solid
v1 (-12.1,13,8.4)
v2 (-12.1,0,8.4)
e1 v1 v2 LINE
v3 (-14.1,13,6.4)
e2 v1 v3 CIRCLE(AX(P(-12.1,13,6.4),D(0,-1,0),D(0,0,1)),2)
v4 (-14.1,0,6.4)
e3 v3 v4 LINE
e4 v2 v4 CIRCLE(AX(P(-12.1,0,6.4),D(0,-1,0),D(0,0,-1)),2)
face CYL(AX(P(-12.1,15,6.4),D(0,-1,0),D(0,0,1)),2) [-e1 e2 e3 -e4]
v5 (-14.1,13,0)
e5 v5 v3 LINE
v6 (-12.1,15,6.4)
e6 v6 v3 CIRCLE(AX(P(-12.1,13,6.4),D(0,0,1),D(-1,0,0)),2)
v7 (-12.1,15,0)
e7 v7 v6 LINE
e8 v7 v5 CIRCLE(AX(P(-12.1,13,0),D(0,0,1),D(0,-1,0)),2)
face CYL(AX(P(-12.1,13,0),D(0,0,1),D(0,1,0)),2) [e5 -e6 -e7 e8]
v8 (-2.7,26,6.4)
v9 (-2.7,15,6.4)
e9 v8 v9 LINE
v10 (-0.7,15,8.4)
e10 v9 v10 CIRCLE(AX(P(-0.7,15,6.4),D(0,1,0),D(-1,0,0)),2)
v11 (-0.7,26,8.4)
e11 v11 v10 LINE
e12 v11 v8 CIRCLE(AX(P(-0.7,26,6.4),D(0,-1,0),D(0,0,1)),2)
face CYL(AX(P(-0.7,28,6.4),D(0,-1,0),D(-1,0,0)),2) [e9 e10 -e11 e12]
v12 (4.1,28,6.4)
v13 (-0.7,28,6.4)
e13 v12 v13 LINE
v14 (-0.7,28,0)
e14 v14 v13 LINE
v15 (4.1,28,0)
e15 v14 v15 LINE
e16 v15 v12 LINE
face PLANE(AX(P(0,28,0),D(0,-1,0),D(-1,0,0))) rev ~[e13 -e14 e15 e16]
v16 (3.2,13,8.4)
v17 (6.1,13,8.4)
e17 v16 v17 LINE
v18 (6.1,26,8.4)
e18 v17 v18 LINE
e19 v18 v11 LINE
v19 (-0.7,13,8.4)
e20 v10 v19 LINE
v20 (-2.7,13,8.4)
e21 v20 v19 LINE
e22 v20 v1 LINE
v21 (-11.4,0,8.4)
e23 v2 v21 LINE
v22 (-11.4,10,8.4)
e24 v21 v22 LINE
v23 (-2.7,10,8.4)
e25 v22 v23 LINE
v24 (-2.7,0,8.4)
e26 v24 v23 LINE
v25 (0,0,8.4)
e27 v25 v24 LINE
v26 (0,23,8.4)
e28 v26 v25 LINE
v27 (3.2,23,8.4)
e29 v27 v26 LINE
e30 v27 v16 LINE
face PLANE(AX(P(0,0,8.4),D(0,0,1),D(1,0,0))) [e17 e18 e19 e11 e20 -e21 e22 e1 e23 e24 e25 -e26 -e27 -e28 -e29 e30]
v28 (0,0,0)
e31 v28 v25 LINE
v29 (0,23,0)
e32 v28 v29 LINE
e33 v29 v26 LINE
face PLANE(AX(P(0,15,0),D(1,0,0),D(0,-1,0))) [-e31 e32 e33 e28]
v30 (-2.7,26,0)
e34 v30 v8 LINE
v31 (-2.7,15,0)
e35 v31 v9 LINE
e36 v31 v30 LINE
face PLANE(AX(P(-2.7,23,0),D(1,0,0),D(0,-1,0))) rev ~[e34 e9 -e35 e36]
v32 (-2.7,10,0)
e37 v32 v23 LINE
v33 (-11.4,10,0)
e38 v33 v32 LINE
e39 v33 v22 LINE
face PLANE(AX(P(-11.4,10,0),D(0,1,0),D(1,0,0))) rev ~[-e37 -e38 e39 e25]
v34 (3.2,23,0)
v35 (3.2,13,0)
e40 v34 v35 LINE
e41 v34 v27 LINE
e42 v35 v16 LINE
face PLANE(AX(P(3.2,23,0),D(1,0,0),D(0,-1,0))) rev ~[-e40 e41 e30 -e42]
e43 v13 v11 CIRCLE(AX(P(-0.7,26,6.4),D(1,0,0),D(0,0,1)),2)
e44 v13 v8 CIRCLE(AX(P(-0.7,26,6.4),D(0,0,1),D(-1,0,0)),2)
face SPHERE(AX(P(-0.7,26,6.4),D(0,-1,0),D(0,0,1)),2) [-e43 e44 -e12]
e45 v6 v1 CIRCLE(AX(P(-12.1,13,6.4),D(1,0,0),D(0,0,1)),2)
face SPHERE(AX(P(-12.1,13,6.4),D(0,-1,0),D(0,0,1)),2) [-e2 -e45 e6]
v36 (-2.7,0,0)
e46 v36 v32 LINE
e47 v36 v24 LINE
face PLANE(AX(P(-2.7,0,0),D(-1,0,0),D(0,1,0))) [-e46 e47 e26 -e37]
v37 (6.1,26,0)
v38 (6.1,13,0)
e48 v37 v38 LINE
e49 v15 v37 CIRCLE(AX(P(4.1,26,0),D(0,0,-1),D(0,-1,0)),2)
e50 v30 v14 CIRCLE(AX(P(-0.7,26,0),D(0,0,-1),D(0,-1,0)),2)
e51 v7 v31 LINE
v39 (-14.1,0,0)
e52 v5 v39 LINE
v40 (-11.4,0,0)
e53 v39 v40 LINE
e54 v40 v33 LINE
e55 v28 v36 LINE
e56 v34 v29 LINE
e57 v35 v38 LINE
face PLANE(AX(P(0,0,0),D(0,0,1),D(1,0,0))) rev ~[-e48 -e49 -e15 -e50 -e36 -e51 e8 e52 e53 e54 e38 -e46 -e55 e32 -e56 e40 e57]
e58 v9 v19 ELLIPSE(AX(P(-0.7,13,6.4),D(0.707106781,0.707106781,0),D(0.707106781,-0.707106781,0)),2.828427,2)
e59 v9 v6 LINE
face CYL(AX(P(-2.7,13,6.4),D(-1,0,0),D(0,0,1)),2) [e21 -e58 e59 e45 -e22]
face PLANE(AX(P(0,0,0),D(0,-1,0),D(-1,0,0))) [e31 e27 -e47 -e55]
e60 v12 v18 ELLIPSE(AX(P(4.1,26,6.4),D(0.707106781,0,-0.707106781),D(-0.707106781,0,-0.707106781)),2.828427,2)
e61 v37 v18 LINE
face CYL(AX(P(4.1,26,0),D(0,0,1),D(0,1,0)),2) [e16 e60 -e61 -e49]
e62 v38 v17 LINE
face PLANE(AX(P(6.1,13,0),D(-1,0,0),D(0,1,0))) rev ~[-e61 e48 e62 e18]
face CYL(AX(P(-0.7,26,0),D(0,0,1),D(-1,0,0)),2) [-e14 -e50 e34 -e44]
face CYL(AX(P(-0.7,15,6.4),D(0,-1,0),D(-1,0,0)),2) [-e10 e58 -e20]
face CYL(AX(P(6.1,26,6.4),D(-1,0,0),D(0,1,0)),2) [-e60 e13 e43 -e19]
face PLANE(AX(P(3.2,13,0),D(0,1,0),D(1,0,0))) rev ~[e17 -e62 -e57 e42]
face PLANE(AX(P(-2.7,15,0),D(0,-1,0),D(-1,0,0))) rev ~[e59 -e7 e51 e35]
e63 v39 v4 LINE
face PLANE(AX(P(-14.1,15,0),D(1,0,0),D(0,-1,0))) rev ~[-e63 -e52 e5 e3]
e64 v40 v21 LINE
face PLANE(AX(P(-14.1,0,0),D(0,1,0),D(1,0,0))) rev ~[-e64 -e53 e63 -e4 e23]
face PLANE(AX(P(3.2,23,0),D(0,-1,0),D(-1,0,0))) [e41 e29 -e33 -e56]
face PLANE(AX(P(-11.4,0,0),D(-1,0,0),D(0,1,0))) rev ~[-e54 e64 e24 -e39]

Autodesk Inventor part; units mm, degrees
ref_plane "YZ Plane" through (0, 0, 0) normal (1, 0, 0) x (0, 1, 0)
ref_plane "XZ Plane" through (0, 0, 0) normal (0, 1, 0) x (-1, 0, 0)
ref_plane "XY Plane" through (0, 0, 0) normal (0, 0, 1) x (1, 0, 0)
sketch "Sketch1" plane through (0, 0, 0) normal (0, 0, 1) x (1, 0, 0)
  line L0 (0, 0) -> (-8.7, 0)
  line L1 (-8.7, 0) -> (-8.7, 8.7)
  line L2 (-8.7, 8.7) -> (0, 8.7)
  line L3 (0, 8.7) -> (0, 0)
  dimension "d0" = 8.7
  dimension "d1" = 8.7
extrude "Extrusion1" [suppressed]
sketch "Sketch2" plane through (-8.7, 0, 0) normal (-1, 0, 0) x (0, 0, 1)
  line L0 (0, 8.7) -> (0, 0) projected
  line L1 (0, 0) -> (3, 0)
  line L2 (3, 0) -> (3, 8.7)
  line L3 (3, 8.7) -> (0, 8.7)
  line L4 (0, 8.7) -> (0, 0)
extrude "Extrusion2" [suppressed]
sketch "Sketch3" plane through (0, 0, 3) normal (0, 0, 1) x (1, 0, 0)
  line L0 (0, 8.7) -> (-11.7, 8.7) projected
  line L1 (0, 0) -> (-11.7, 0) projected
  line L2 (-11.7, 8.7) -> (-8.7, 8.7)
  line L3 (-8.7, 8.7) -> (-8.7, 0)
  line L4 (-8.7, 0) -> (-11.7, 0)
  line L5 (-11.7, 0) -> (-11.7, 8.7)
  dimension "d6" = 3
extrude "Extrusion3" [suppressed]
sketch "Sketch5" plane through (0, 0, 0) normal (1, 0, 0) x (0, 0, -1)
  line L0 (0, 8.7) -> (-3, 8.7) projected
  line L1 (0, 0) -> (-3, 0)
  line L2 (-3, 0) -> (-3, 8.7)
  line L3 (-3, 8.7) -> (0, 8.7)
  line L4 (0, 8.7) -> (0, 0)
  dimension "d9" = 3
extrude "Extrusion4" [suppressed]
sketch "Sketch6" plane through (0, 0, 3) normal (0, 0, 1) x (1, 0, 0)
  line L0 (3, 8.7) -> (-11.7, 8.7) projected
  line L1 (3, 8.7) -> (0, 8.7)
  line L2 (0, 8.7) -> (0, 0)
  line L3 (0, 0) -> (3, 0)
  line L4 (3, 0) -> (3, 8.7)
extrude "Extrusion5" [suppressed]
sketch "Sketch7" plane through (0, 0, 0) normal (0, 0, 1) x (1, 0, 0)
  line L0 (0, 0) -> (-2.7, 0)
  line L1 (-2.7, 0) -> (-2.7, 15)
  line L2 (-2.7, 15) -> (0, 15)
  line L3 (0, 15) -> (0, 0)
  line L4 (-2.7, 15) -> (-11.4, 15)
  line L5 (-11.4, 15) -> (-11.4, 10)
  line L6 (-11.4, 10) -> (-2.7, 10)
  line L7 (-2.7, 10) -> (-2.7, 15)
  line L8 (-11.4, 15) -> (-14.1, 15)
  line L9 (-14.1, 15) -> (-14.1, 0)
  line L10 (-14.1, 0) -> (-11.4, 0)
  line L11 (-11.4, 0) -> (-11.4, 15)
  line L12 (-2.7, 15) -> (0, 15)
  line L13 (0, 15) -> (0, 23)
  line L14 (0, 23) -> (-2.7, 23)
  line L15 (-2.7, 23) -> (-2.7, 15)
  line L16 (-2.7, 23) -> (0, 23)
  line L17 (0, 23) -> (0, 28)
  line L18 (0, 28) -> (-2.7, 28)
  line L19 (-2.7, 28) -> (-2.7, 23)
  line L20 (0, 28) -> (3.2, 28)
  line L21 (3.2, 28) -> (3.2, 23)
  line L22 (3.2, 23) -> (0, 23)
  line L23 (0, 23) -> (0, 28)
  line L24 (3.2, 28) -> (6.1, 28)
  line L25 (6.1, 28) -> (6.1, 23)
  line L26 (6.1, 23) -> (3.2, 23)
  line L27 (3.2, 23) -> (3.2, 28)
  line L28 (6.1, 23) -> (3.2, 23)
  line L29 (3.2, 23) -> (3.2, 13)
  line L30 (3.2, 13) -> (6.1, 13)
  line L31 (6.1, 13) -> (6.1, 23)
  point P0 (-11.4, 10)
  point P1 (-2.7, 10)
  dimension "d14" = 2.7
  dimension "d15" = 15
  dimension "d16" = 8.7
  dimension "d17" = 5
  dimension "d18" = 2.7
  dimension "d19" = 15
  dimension "d23" = 2.7
  dimension "d24" = 8
  dimension "d25" = 5
  dimension "d26" = 3.2
  dimension "d27" = 5
  dimension "d28" = 2.9
  dimension "d29" = 2.9
  dimension "d30" = 10
extrude "Extrusion6" add sketch "Sketch7" along normal blind 8.4
fillet "Fillet1" radius 2 3 edges at (-14.1, 7.5, 8.4) (-8.4, 15, 8.4) (-14.1, 15, 4.2)
fillet "Fillet2" radius 2 4 edges at (-2.7, 21.5, 8.4) (1.7, 28, 8.4) (6.1, 28, 4.2) (-2.7, 28, 4.2)
properties part number "Hook_TestFit"
